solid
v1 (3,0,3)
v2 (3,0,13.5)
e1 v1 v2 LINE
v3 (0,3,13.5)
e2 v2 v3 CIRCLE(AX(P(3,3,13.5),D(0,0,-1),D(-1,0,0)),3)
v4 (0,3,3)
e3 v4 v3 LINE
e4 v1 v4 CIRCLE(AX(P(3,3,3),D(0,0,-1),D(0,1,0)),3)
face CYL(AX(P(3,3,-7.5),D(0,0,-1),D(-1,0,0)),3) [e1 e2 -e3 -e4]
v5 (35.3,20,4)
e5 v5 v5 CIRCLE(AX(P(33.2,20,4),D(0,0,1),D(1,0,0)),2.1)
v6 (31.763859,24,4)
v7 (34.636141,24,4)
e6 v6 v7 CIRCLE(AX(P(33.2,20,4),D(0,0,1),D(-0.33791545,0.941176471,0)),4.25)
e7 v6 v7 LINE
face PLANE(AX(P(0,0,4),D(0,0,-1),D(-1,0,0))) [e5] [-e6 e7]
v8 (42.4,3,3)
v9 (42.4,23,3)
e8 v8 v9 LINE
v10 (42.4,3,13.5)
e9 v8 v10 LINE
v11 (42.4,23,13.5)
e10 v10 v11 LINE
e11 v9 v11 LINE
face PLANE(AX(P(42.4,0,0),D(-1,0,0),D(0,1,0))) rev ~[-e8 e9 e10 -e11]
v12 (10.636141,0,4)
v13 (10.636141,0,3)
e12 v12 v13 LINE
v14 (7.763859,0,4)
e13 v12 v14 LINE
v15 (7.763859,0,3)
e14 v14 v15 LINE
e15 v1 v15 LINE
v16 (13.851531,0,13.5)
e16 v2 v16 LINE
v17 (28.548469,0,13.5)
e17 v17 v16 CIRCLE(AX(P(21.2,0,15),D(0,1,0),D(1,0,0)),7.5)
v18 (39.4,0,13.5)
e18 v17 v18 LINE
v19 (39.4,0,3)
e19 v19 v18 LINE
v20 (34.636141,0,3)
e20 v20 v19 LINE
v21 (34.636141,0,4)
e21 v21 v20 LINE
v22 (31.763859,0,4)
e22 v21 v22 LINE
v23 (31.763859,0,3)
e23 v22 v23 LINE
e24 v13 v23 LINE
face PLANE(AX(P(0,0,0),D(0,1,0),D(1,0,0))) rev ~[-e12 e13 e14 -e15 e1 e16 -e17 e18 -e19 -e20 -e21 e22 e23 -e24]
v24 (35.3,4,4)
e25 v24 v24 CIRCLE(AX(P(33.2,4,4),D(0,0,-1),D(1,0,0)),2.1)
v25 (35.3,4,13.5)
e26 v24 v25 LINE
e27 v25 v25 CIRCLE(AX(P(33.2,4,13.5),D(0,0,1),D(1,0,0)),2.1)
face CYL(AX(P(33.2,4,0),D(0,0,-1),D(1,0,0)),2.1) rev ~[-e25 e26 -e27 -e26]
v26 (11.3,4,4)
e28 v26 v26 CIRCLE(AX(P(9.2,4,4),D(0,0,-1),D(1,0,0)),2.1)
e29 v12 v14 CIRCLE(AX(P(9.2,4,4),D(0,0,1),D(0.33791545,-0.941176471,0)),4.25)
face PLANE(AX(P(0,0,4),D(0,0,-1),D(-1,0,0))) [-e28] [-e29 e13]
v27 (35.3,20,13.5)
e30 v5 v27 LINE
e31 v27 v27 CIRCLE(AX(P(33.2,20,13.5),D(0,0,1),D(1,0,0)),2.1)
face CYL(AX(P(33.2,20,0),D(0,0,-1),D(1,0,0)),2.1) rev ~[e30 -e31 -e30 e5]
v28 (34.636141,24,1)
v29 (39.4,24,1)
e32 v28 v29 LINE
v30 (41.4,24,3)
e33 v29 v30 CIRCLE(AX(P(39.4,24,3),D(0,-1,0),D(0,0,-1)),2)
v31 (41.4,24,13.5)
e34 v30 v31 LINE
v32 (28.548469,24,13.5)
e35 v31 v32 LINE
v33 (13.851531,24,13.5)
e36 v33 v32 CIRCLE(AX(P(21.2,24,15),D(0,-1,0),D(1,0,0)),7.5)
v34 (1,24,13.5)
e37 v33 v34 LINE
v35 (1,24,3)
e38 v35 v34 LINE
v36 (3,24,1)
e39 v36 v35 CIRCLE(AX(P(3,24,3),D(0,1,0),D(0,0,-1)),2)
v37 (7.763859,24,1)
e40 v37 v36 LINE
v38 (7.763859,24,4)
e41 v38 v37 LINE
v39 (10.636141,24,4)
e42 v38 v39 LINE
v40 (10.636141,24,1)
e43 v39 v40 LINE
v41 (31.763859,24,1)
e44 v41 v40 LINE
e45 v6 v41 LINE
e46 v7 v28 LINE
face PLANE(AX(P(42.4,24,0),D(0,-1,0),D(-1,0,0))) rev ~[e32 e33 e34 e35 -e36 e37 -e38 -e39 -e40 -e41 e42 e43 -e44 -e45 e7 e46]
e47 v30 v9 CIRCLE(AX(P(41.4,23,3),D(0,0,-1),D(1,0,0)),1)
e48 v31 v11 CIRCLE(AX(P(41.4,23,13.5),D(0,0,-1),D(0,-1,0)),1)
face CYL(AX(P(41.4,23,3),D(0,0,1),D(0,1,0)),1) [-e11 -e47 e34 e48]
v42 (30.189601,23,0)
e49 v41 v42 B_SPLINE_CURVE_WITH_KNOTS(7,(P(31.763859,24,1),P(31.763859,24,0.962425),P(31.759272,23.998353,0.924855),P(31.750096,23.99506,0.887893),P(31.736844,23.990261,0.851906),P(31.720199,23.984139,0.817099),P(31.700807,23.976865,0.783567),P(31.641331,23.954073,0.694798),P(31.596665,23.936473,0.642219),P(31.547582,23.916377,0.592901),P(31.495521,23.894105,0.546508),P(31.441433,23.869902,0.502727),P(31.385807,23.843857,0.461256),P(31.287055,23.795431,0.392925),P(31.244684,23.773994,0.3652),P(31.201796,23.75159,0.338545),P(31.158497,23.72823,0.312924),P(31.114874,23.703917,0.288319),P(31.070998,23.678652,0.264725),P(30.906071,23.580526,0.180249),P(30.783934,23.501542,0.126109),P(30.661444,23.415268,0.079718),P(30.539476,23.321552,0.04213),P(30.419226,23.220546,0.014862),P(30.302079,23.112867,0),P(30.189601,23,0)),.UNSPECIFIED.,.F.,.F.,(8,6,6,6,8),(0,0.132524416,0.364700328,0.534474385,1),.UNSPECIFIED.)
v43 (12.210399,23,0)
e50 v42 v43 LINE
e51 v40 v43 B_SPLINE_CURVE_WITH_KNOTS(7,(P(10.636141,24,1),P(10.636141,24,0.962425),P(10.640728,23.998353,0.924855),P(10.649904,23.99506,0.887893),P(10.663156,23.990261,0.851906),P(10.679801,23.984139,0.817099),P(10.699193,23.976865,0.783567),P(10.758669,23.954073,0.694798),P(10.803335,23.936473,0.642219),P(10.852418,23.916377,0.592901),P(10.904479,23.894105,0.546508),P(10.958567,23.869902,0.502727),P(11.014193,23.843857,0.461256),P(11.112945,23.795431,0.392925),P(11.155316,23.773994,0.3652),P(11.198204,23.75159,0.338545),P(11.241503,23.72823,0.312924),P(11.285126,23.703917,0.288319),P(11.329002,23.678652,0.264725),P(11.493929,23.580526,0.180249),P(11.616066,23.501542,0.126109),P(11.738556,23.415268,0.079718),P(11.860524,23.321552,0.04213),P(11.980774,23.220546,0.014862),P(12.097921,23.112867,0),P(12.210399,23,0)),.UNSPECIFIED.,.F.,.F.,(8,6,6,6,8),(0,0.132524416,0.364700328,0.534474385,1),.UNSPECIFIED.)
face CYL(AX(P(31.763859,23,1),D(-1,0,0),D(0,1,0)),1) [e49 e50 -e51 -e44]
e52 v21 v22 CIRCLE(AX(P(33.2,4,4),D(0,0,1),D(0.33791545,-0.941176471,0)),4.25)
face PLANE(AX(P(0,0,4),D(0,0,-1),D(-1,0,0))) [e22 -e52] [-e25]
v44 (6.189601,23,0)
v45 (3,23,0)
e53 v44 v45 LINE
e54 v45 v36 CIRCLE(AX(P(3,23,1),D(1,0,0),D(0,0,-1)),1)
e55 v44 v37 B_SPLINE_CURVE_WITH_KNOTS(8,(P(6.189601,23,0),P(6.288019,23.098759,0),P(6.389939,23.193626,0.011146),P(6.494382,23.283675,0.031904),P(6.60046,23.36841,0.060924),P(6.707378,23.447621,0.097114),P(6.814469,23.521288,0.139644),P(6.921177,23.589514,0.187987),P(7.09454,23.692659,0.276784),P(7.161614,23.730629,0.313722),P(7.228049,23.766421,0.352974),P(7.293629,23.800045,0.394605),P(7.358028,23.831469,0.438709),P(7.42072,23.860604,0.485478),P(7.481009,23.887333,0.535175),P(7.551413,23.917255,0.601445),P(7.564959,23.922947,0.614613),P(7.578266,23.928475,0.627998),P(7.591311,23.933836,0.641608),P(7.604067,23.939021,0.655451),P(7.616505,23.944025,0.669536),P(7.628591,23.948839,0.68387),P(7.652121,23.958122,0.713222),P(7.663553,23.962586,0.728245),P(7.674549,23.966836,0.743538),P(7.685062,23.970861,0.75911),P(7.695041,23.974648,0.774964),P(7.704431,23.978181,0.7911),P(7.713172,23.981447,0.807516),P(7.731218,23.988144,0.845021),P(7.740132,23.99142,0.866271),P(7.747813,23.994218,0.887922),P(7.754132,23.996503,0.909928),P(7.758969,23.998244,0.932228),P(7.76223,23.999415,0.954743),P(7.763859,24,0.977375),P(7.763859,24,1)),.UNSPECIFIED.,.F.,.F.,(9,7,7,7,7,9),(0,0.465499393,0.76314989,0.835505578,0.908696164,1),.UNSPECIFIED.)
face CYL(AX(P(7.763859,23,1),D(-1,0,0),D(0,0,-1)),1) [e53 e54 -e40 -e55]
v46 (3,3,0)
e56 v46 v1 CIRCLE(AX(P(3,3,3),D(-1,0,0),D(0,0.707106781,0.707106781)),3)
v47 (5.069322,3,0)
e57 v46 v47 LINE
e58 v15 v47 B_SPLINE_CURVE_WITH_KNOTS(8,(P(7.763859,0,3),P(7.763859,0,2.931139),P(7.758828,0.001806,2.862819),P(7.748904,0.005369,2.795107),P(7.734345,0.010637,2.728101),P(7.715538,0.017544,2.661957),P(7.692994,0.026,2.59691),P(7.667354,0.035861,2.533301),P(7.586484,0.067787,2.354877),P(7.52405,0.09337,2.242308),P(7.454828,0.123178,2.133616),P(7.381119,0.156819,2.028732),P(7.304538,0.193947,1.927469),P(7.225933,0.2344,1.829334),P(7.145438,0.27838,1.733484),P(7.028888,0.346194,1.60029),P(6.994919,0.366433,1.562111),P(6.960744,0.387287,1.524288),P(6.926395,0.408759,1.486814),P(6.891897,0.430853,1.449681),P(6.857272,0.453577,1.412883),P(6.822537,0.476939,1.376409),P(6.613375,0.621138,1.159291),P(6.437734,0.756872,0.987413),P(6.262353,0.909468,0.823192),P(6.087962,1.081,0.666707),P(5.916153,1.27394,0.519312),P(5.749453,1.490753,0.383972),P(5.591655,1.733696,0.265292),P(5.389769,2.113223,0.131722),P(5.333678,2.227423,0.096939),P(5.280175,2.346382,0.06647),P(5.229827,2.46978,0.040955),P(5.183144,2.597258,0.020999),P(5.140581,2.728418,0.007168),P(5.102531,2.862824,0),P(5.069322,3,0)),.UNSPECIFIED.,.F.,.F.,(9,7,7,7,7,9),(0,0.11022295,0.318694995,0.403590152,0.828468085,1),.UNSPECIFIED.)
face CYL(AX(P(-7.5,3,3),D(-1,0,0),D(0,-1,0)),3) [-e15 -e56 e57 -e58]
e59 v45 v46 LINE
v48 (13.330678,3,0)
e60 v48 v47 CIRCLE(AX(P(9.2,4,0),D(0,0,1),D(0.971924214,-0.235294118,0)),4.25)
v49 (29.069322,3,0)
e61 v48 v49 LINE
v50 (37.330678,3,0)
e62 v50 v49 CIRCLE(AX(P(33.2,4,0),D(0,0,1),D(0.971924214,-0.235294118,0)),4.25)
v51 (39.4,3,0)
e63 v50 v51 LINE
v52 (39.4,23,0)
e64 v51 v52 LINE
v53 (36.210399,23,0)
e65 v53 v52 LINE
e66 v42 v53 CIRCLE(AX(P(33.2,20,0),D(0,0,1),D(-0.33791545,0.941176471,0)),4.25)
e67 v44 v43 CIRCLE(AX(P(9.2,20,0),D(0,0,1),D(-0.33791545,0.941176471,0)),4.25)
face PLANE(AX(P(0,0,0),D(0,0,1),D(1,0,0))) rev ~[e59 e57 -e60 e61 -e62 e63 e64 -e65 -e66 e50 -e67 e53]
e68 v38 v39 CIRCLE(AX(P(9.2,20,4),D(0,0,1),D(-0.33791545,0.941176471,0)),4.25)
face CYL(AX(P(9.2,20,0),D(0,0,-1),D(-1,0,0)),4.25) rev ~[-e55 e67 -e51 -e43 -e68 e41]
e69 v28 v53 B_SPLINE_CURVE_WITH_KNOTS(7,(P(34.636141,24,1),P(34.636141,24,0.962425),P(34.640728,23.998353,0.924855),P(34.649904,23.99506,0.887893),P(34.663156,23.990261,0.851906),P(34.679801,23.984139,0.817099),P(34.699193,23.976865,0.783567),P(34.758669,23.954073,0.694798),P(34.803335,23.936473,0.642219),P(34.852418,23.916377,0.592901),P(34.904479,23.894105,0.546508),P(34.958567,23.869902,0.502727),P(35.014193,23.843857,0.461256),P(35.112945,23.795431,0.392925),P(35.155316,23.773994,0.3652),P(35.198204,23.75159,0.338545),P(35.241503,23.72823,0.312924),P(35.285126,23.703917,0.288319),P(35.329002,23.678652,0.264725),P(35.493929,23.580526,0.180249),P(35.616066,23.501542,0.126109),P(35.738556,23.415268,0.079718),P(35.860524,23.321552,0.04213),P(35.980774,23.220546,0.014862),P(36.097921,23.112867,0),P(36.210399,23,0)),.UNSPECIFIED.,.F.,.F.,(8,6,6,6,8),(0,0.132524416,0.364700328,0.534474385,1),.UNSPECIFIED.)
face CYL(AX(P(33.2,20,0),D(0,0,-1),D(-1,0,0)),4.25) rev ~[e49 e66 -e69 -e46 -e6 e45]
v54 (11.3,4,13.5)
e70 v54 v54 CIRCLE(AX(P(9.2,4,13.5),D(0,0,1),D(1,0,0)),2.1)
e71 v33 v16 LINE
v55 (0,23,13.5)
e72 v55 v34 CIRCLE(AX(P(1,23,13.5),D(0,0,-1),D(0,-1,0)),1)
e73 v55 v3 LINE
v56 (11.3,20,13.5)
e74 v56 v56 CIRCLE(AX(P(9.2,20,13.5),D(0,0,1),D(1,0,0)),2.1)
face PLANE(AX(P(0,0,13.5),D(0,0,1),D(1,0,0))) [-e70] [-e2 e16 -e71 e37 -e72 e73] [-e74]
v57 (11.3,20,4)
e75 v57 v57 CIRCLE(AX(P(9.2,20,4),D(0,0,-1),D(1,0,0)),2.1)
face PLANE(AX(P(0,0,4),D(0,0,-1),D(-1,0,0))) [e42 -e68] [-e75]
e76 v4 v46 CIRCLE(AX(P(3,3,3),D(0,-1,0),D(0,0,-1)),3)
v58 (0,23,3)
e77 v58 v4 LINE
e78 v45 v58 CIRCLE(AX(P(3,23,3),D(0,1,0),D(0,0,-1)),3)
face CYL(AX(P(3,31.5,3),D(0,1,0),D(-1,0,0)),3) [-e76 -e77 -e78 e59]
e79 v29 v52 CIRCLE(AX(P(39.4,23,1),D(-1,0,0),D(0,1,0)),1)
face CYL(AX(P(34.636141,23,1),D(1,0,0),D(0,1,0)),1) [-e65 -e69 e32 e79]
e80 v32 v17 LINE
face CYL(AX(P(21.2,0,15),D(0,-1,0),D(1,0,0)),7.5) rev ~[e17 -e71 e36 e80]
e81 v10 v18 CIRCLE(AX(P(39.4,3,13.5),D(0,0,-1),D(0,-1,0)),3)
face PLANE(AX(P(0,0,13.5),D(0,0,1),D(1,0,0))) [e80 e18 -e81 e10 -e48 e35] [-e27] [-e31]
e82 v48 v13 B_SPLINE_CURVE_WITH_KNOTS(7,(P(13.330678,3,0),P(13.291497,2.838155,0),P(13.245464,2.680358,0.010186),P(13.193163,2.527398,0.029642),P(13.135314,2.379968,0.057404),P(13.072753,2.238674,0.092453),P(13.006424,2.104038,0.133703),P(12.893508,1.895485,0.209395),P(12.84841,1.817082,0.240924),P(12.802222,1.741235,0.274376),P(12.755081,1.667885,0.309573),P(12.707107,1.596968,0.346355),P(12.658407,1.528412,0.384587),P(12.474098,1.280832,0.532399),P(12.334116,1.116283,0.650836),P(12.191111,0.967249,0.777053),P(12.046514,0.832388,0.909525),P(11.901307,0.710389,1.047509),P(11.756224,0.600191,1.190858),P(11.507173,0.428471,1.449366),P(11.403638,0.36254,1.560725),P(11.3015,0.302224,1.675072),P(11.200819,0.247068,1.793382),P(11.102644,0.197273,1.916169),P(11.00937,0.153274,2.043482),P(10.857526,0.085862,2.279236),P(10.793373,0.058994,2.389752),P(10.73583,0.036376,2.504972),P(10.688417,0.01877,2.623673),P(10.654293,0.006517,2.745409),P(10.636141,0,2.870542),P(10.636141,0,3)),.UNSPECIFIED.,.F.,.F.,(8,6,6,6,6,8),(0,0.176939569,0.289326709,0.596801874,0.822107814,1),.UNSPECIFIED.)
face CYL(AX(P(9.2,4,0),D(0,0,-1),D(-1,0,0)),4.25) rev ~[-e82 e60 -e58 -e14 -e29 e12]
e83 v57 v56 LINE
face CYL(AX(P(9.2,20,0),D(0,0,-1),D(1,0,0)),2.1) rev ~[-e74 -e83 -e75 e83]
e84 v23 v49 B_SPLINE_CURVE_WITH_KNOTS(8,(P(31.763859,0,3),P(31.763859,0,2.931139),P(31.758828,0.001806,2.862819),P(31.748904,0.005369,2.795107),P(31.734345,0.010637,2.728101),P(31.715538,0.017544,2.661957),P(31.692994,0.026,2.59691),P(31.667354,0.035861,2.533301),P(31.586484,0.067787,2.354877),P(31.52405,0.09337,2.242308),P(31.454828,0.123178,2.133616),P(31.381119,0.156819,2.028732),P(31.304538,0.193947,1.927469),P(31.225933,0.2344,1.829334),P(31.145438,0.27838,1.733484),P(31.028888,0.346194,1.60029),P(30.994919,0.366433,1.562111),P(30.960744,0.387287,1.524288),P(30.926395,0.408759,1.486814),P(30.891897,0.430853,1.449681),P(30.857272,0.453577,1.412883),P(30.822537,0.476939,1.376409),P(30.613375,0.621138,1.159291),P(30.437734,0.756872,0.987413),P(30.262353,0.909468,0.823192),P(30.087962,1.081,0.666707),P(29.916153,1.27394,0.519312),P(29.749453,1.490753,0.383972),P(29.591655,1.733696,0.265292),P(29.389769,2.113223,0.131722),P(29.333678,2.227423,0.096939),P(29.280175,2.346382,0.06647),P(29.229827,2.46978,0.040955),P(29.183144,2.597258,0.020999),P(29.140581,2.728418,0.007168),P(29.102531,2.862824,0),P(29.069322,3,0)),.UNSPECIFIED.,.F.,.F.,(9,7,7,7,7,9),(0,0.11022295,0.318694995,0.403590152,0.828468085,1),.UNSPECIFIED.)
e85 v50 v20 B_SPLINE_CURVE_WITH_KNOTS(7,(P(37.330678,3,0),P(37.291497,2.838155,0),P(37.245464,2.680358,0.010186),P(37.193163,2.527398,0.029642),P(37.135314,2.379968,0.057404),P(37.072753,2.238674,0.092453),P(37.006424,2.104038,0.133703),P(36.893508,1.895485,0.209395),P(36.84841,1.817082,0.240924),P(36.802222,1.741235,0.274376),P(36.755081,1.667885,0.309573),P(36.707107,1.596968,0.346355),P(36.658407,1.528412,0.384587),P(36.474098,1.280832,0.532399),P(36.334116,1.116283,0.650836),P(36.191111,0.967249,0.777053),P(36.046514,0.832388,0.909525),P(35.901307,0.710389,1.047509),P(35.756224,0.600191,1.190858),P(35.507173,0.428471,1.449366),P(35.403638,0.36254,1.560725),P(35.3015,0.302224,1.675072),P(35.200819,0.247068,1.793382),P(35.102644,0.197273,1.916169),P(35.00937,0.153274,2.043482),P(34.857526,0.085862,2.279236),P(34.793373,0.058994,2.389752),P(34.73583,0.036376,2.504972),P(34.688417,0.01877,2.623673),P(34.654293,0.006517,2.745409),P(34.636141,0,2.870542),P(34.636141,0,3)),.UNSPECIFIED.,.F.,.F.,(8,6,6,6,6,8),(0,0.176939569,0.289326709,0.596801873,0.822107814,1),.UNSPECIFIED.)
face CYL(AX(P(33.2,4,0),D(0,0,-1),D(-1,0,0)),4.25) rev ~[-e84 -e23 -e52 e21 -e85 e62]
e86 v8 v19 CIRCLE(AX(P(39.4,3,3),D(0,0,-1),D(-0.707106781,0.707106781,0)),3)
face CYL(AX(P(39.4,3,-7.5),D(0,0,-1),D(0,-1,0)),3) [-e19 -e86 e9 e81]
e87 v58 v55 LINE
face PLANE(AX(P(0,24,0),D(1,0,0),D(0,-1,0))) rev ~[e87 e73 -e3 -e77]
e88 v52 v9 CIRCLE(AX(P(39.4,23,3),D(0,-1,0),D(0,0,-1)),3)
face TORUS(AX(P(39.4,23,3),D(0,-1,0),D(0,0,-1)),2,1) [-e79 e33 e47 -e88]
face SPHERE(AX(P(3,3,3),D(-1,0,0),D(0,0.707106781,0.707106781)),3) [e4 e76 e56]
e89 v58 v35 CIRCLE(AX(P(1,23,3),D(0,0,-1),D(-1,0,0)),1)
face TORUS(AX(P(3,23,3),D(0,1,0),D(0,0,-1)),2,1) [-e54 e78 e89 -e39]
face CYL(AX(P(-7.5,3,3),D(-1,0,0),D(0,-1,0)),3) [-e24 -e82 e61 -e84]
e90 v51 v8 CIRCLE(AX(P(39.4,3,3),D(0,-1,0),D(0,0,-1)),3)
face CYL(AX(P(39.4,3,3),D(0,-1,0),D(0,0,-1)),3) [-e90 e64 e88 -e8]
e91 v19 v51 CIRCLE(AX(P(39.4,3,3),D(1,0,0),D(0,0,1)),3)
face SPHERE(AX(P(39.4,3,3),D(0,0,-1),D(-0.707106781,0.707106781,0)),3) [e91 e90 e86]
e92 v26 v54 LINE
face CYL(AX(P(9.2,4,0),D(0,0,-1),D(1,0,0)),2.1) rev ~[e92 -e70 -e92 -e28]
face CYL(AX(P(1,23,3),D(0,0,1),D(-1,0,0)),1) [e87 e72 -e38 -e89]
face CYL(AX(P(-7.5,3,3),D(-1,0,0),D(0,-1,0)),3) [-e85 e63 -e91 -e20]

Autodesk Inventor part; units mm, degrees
ref_plane "YZ Plane" through (0, 0, 0) normal (1, 0, 0) x (0, 1, 0)
ref_plane "XZ Plane" through (0, 0, 0) normal (0, 1, 0) x (-1, 0, 0)
ref_plane "XY Plane" through (0, 0, 0) normal (0, 0, 1) x (1, 0, 0)
sketch "Sketch1" plane through (0, 0, 0) normal (0, 0, 1) x (1, 0, 0)
  line L0 (0, 0) -> (42.4, 0)
  line L1 (42.4, 0) -> (42.4, 24)
  line L2 (42.4, 24) -> (0, 24)
  line L3 (0, 24) -> (0, 0)
  circle A0 centre (9.2, 20) radius 2.1
  circle A1 centre (33.2, 20) radius 2.1
  circle A2 centre (33.2, 4) radius 2.1
  circle A3 centre (9.2, 4) radius 2.1
  dimension "d0" = 24
  dimension "d1" = 42.4
  dimension "d2" = 4.2
  dimension "d3" = 9.2
  dimension "d4" = 9.2
  dimension "d5" = 9.2
  dimension "d6" = 9.2
  dimension "d7" = 4
  dimension "d8" = 4
  dimension "d9" = 4
  dimension "d10" = 4
extrude "Extrusion1" add sketch "Sketch1" along normal blind 13.5
sketch "Sketch2" plane through (0, 0, 0) normal (0, -1, 0) x (1, 0, 0)
  line L0 (42.4, 13.5) -> (0, 13.5) projected
  line L1 (0, 0) -> (0, 13.5) projected
  circle A0 centre (21.2, 15) radius 7.5
  dimension "d13" = 15
  dimension "d14" = 21.2
  dimension "d15" = 1.5
extrude "Extrusion2" cut sketch "Sketch2" against normal through all
fillet "Fillet1" radius 3 3 edges at (42.4, 0, 6.75) (0, 0, 6.75) (21.2, 0, 0)
sketch "Sketch3" plane through (0, 0, 0) normal (0, 0, -1) x (-1, 0, 0)
  arc A0 (-31.3534, 3) -> (-35.0466, 3) centre (-33.2, 4) ccw projected
  arc A1 (-7.3534, 3) -> (-11.0466, 3) centre (-9.2, 4) ccw projected
  circle A2 centre (-33.2, 20) radius 2.1 projected
  circle A3 centre (-9.2, 20) radius 2.1 projected
  circle A4 centre (-33.2, 20) radius 4.25
  circle A5 centre (-9.2, 20) radius 4.25
  circle A6 centre (-9.2, 4) radius 4.25
  circle A7 centre (-33.2, 4) radius 4.25
  point P0 (0, 0)
  dimension "d20" = 8.5
extrude "Extrusion3" cut sketch "Sketch3" against normal blind 4
sketch "Sketch4" plane through (21.2, 0, 15) normal (0, -1, 0) x (1, 0, 0)
  line L0 (-26.3081, 1.9971) -> (24.247, 1.9971)
  line L1 (24.247, 1.9971) -> (24.247, -18.7305)
  line L2 (24.247, -18.7305) -> (-26.3081, -18.7305)
  line L3 (-26.3081, -18.7305) -> (-26.3081, 1.9971)
  point P0 (-21.2, -15)
extrude "Extrusion4" [suppressed]
fillet "Fillet3" radius 3 2 edges at (42.4, 13.5, 0) (0, 13.5, 0)
fillet "Fillet4" radius 1 7 edges at (41.5213, 24, 0.8787) (37.0181, 24, 0) (42.4, 24, 8.25) (21.2, 24, 0) (0.8787, 24, 0.8787) (0, 24, 8.25) (5.3819, 24, 0)
properties part number "Z move plate"
